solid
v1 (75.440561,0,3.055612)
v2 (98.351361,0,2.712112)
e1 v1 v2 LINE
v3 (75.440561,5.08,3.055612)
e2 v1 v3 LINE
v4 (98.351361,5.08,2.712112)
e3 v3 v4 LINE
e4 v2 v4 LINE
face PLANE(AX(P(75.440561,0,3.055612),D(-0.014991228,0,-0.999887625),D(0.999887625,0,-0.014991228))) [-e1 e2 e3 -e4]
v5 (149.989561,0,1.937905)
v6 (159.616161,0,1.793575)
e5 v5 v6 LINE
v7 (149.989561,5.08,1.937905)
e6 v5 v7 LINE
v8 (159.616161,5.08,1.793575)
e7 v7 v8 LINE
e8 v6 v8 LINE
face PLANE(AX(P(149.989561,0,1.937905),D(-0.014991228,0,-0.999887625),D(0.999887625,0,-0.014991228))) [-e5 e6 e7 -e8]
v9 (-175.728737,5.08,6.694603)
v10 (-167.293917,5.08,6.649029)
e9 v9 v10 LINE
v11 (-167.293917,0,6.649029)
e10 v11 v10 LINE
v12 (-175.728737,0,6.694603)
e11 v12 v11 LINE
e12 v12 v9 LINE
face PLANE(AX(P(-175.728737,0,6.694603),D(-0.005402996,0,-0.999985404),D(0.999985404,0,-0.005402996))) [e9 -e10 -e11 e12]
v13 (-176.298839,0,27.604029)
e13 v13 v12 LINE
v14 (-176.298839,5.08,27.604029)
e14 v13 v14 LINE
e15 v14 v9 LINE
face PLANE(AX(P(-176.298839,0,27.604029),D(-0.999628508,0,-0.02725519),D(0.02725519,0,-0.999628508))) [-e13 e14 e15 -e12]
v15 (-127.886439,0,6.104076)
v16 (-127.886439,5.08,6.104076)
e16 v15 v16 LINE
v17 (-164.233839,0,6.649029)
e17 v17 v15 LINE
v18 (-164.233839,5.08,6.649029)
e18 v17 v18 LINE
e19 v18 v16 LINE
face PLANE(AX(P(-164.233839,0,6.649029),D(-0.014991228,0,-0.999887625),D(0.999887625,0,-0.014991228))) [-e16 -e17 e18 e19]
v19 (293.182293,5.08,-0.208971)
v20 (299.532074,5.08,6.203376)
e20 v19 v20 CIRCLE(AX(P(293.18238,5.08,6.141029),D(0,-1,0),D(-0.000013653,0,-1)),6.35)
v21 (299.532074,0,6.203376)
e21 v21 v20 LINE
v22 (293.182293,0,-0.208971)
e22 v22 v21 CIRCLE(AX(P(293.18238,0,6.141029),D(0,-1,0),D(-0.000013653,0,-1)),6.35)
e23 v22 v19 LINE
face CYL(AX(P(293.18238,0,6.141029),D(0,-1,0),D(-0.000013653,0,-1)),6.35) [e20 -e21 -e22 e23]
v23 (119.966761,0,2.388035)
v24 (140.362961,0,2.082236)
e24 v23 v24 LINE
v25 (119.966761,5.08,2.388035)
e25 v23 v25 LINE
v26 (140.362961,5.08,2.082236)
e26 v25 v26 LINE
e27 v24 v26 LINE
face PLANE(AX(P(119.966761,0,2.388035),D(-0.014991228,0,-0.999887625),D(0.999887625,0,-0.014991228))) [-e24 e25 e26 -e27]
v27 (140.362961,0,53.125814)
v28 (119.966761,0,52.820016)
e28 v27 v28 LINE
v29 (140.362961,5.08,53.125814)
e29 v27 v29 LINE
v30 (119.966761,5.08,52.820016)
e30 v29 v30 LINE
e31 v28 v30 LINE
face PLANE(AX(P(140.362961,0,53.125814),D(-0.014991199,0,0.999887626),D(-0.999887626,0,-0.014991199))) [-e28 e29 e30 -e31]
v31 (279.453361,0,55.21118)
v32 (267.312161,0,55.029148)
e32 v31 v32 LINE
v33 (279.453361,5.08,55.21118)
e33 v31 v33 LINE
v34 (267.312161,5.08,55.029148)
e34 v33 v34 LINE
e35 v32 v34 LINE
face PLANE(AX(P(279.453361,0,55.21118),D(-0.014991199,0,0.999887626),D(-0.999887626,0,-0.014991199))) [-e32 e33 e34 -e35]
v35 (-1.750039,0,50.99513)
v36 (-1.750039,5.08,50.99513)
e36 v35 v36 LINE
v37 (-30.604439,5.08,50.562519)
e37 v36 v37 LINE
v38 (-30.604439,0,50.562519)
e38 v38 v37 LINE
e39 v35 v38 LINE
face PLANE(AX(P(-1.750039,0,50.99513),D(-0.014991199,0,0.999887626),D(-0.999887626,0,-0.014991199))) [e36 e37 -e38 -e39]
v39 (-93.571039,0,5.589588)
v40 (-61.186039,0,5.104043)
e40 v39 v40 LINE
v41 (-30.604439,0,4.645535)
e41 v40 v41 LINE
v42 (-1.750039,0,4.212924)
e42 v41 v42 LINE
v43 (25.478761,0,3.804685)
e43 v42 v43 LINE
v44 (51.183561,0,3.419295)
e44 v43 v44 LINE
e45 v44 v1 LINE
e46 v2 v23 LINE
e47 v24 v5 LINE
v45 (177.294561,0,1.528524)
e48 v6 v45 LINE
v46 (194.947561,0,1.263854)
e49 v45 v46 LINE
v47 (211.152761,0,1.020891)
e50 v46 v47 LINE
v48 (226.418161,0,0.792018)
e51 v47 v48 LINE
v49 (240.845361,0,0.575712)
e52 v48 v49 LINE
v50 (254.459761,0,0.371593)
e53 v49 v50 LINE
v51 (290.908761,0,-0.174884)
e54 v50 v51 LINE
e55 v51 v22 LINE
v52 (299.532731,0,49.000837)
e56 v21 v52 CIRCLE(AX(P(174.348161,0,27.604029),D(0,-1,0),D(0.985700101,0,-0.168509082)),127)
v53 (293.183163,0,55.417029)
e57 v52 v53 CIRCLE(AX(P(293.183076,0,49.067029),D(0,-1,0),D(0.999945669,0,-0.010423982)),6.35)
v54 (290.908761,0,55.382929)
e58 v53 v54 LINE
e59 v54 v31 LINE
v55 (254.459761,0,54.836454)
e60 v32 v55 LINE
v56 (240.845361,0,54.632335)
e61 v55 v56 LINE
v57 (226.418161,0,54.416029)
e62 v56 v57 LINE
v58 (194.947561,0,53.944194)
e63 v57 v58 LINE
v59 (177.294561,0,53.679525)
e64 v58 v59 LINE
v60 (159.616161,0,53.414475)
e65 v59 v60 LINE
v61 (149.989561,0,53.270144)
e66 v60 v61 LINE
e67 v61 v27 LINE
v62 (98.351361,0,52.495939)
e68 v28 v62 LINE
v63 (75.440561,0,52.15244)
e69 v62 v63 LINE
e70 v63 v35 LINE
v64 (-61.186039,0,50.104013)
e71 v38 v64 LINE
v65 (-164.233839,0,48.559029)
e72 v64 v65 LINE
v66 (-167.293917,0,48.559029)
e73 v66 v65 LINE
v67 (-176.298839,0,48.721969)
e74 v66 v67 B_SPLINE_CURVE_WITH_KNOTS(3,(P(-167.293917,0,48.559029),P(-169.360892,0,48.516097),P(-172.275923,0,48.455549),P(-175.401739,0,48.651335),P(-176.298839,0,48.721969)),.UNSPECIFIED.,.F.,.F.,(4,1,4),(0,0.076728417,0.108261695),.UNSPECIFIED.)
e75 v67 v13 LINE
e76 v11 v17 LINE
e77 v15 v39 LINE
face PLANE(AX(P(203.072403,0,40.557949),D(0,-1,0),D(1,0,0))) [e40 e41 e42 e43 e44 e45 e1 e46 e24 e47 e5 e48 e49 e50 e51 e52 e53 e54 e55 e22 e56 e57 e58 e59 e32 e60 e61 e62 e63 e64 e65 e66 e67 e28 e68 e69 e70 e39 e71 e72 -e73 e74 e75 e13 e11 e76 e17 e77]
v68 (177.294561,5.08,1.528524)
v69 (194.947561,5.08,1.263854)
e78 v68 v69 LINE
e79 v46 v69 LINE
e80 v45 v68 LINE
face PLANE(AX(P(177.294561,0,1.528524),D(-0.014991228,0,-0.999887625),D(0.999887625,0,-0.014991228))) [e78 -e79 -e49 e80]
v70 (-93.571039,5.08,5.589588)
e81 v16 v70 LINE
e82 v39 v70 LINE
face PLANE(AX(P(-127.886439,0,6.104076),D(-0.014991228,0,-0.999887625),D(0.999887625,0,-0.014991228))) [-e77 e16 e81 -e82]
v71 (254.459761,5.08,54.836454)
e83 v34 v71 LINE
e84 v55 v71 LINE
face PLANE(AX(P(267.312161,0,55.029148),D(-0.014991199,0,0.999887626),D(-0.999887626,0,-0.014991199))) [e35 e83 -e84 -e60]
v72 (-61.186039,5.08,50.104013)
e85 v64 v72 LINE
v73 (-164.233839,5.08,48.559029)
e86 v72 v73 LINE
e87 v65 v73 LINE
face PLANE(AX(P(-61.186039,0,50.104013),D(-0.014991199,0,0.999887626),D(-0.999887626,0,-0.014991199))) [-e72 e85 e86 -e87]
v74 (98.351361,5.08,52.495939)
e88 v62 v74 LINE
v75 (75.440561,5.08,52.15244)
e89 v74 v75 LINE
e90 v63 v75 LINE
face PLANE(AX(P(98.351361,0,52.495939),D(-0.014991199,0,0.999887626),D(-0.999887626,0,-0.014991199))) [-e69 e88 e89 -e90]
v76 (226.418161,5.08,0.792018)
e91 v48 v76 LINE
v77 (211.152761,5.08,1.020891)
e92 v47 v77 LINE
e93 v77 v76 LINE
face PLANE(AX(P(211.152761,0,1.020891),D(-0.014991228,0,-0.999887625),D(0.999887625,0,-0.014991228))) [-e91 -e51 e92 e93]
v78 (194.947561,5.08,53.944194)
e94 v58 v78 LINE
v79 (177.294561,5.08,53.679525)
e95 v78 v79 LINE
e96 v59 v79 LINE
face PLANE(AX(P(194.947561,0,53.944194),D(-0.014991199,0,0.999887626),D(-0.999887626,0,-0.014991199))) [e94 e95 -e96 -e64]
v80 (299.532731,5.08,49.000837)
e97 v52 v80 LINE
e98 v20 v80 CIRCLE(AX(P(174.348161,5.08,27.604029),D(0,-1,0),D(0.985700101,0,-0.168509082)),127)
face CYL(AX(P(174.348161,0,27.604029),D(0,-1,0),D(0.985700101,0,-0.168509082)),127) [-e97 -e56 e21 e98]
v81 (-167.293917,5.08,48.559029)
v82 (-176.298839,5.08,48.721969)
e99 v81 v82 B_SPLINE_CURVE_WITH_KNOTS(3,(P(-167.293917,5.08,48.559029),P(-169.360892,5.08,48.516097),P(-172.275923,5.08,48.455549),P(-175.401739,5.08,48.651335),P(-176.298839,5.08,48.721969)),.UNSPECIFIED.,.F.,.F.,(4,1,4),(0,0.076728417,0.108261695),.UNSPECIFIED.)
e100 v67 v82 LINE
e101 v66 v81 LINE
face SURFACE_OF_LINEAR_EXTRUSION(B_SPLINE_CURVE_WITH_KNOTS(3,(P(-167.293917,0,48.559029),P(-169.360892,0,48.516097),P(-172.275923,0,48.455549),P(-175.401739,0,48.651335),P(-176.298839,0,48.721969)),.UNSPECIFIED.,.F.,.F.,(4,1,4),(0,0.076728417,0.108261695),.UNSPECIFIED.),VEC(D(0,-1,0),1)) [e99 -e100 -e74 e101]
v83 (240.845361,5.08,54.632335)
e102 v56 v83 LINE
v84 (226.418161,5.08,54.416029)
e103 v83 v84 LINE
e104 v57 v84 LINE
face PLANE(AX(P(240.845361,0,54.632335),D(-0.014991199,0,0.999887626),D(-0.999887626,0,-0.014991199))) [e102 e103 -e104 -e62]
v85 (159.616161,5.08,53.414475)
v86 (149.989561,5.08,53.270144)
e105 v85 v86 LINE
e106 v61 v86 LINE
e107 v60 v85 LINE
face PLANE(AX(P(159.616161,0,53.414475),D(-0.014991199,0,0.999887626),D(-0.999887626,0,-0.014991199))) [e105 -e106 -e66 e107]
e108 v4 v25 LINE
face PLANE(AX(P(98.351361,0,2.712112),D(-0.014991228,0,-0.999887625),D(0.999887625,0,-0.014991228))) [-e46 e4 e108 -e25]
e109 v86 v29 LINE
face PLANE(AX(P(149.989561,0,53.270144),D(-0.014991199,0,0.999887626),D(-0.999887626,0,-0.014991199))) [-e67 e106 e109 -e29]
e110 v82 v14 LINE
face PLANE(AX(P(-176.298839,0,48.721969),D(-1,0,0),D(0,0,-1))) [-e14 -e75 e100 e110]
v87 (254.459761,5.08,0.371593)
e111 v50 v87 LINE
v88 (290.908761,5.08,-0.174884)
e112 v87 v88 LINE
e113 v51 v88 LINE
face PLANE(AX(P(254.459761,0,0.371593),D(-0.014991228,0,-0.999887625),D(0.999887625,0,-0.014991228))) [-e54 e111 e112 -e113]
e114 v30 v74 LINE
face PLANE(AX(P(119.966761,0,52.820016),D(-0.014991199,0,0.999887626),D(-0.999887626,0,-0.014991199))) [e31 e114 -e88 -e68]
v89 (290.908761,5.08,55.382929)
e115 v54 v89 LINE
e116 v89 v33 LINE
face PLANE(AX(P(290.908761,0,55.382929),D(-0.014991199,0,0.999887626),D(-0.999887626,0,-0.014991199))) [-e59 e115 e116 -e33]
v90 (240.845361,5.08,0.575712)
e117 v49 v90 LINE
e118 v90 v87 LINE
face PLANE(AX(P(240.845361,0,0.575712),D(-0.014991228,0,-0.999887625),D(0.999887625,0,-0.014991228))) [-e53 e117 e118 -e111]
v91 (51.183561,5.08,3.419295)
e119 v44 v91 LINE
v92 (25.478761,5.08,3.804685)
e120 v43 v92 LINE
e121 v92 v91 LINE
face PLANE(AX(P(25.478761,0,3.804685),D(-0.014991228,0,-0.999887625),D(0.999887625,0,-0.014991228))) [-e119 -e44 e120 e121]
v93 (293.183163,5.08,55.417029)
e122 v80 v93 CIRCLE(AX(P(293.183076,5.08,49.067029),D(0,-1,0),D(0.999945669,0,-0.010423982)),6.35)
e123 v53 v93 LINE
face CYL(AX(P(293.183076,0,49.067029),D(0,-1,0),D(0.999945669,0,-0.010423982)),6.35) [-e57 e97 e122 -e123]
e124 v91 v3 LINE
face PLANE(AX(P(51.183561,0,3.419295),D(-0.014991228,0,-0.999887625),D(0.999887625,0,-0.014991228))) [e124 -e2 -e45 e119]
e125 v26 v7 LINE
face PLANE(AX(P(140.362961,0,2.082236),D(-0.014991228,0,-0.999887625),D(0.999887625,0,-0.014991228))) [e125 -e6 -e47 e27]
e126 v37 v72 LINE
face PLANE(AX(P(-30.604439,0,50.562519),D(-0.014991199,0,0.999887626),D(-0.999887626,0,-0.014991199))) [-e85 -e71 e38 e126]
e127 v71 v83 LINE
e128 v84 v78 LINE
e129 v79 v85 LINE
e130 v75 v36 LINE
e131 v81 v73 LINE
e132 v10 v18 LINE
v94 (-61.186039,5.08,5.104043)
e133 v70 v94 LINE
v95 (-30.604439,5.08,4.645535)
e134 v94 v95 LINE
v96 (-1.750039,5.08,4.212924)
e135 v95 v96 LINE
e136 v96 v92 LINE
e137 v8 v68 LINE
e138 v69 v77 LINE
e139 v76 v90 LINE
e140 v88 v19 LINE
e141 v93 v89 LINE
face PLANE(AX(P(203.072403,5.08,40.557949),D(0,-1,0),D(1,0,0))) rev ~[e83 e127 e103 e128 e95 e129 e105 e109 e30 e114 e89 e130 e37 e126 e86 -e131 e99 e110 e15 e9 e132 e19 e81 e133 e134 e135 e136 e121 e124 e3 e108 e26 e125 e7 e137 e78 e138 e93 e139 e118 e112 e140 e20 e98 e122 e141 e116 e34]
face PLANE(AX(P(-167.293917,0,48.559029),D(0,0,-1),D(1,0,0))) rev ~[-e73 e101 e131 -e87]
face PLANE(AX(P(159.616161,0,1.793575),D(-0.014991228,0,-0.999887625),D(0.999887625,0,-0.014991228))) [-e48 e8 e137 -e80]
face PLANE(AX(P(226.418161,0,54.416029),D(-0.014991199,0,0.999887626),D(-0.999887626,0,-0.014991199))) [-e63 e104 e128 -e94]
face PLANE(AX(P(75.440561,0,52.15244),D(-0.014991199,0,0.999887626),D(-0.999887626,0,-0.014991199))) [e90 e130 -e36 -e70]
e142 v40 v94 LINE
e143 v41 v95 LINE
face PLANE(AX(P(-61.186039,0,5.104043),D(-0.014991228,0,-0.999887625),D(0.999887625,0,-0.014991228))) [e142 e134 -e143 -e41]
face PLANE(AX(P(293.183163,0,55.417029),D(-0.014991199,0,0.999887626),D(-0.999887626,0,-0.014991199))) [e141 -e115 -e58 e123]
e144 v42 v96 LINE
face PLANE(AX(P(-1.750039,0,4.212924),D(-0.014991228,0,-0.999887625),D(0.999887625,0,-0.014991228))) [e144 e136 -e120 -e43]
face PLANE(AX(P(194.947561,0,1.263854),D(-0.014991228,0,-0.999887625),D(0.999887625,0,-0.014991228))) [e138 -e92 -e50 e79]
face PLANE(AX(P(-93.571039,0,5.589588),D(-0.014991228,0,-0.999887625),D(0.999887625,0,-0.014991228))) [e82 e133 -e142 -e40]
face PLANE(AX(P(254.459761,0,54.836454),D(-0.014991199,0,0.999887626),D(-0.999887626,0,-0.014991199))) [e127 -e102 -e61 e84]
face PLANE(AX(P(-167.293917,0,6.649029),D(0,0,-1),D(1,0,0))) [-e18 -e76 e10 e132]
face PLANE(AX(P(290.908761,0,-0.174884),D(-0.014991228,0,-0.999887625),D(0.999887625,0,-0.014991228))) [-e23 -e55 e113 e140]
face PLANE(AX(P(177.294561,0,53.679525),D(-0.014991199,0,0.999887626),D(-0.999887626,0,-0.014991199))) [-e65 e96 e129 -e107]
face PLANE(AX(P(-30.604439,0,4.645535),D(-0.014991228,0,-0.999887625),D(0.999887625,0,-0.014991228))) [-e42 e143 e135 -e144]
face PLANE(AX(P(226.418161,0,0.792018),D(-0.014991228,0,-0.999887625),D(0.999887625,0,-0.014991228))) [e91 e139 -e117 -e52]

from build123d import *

# Parameters (mm, degrees)
F0_W     = 3.0600779591
F0_H     = 20.955
F1_DEPTH = 5.08


# Not quite as in the source:
# - a feature names something its author has since deleted; it is built from what else it names


with BuildPart() as f1:
    # F0 (on Front) → F1 (new body)
    with BuildSketch(Plane.XZ):
        with BuildLine():
            Line((211.1527612069, 54.1871569779), (194.9475612069, 53.9441942956))
            Line((194.9475612069, 53.9441942956), (194.9475612069, 27.6040292631))
            Line((194.9475612069, 27.6040292631), (199.8751612069, 27.6040292631))
            ThreePointArc((199.8751612069, 27.6040292631), (203.0501612069, 30.7790292631), (206.2251612069, 27.6040292631))
            Line((206.2251612069, 27.6040292631), (211.1527612069, 27.6040292631))
            Line((211.1527612069, 27.6040292631), (211.1527612069, 54.1871569779))
        make_face()
        with BuildLine():
            Line((35.1561612069, 27.6040292631), (25.4787612069, 27.6040292631))
            Line((25.4787612069, 27.6040292631), (25.4787612069, 3.8046848733))
            Line((25.4787612069, 3.8046848733), (51.1835612069, 3.4192950591))
            Line((51.1835612069, 3.4192950591), (51.1835612069, 27.6040292631))
            Line((51.1835612069, 27.6040292631), (41.5061612069, 27.6040292631))
            ThreePointArc((41.5061612069, 27.6040292631), (38.3311612069, 24.4290292631), (35.1561612069, 27.6040292631))
        make_face()
        Polygon((75.4405612069, 52.1524397183), (51.1835612069, 51.7887573333), (51.1835612069, 27.6040292631), (75.4405612069, 27.6040292631), align=None)
        Polygon((119.9667612069, 52.8200158658), (98.3513612069, 52.4959386829), (98.3513612069, 27.6040292631), (119.9667612069, 27.6040292631), align=None)
        Polygon((-127.8864387931, 6.1040758796), (-93.5710387931, 5.589588094), (-93.5710387931, 27.6040292631), (-127.8864387931, 27.6040292631), align=None)
        with BuildLine():
            ThreePointArc((-19.3522387931, 27.6040292631), (-16.1772387931, 30.7790292631), (-13.0022387931, 27.6040292631))
            Line((-13.0022387931, 27.6040292631), (-1.7500387931, 27.6040292631))
            Line((-1.7500387931, 27.6040292631), (-1.7500387931, 50.9951300136))
            Line((-1.7500387931, 50.9951300136), (-30.6044387931, 50.5625193442))
            Line((-30.6044387931, 50.5625193442), (-30.6044387931, 27.6040292631))
            Line((-30.6044387931, 27.6040292631), (-19.3522387931, 27.6040292631))
        make_face()
        Polygon((-93.5710387931, 27.6040292631), (-93.5710387931, 49.6184684202), (-127.8864387931, 49.1039816117), (-127.8864387931, 27.6040292631), align=None)
        Polygon((-30.6044387931, 4.6455353771), (-30.6044387931, 27.6040292631), (-61.1860387931, 27.6040292631), (-61.1860387931, 5.1040426264), align=None)
        Polygon((51.1835612069, 27.6040292631), (51.1835612069, 3.4192950591), (75.4405612069, 3.0556119834), (75.4405612069, 27.6040292631), align=None)
        Polygon((119.9667612069, 27.6040292631), (119.9667612069, 2.388034568), (140.3629612069, 2.0822361285), (140.3629612069, 14.6379053581), (140.3629612069, 27.6040292631), align=None)
        Polygon((98.3513612069, 27.6040292631), (98.3513612069, 2.7121123663), (119.9667612069, 2.388034568), (119.9667612069, 27.6040292631), align=None)
        with BuildLine():
            Line((-74.2035387931, 27.6040292631), (-61.1860387931, 27.6040292631))
            Line((-61.1860387931, 27.6040292631), (-61.1860387931, 50.1040129656))
            Line((-61.1860387931, 50.1040129656), (-93.5710387931, 49.6184684202))
            Line((-93.5710387931, 49.6184684202), (-93.5710387931, 27.6040292631))
            Line((-93.5710387931, 27.6040292631), (-80.5535387931, 27.6040292631))
            ThreePointArc((-80.5535387931, 27.6040292631), (-77.3785387931, 30.7790292631), (-74.2035387931, 27.6040292631))
        make_face()
        with BuildLine():
            Line((25.4787612069, 51.403368251), (25.4787612069, 27.6040292631))
            Line((25.4787612069, 27.6040292631), (35.1561612069, 27.6040292631))
            ThreePointArc((35.1561612069, 27.6040292631), (38.3311612069, 30.7790292631), (41.5061612069, 27.6040292631))
            Line((41.5061612069, 27.6040292631), (51.1835612069, 27.6040292631))
            Line((51.1835612069, 27.6040292631), (51.1835612069, 51.7887573333))
            Line((51.1835612069, 51.7887573333), (25.4787612069, 51.403368251))
        make_face()
        Polygon((-61.1860387931, 27.6040292631), (-30.6044387931, 27.6040292631), (-30.6044387931, 50.5625193442), (-61.1860387931, 50.1040129656), align=None)
        Polygon((-164.2338387931, 6.6490292631), (-127.8864387931, 6.1040758796), (-127.8864387931, 27.6040292631), (-164.2338387931, 27.6040292631), align=None)
        with BuildLine():
            Line((-167.2939167522, 27.6040292631), (-167.2939167522, 48.5590292631))
            add(Edge.make_bspline(
                [(-167.2939167522, 48.5590292631), (-169.3608924509, 48.5160966839), (-172.2759226046, 48.4555494006), (-175.4017391189, 48.6513352899), (-176.2988387931, 48.7219685213)],
                knots=[0, 0, 0, 0, 0.0767284167, 0.1082616947, 0.1082616947, 0.1082616947, 0.1082616947], degree=3))
            Line((-176.2988387931, 48.7219685213), (-176.2988387931, 27.6040292631))
            Line((-176.2988387931, 27.6040292631), (-167.2939167522, 27.6040292631))
        make_face()
        with BuildLine():
            Line((75.4405612069, 27.6040292631), (75.4405612069, 3.0556119834))
            Line((75.4405612069, 3.0556119834), (98.3513612069, 2.7121123663))
            Line((98.3513612069, 2.7121123663), (98.3513612069, 27.6040292631))
            Line((98.3513612069, 27.6040292631), (90.0709612069, 27.6040292631))
            ThreePointArc((90.0709612069, 27.6040292631), (86.8959612069, 24.4290292631), (83.7209612069, 27.6040292631))
            Line((83.7209612069, 27.6040292631), (75.4405612069, 27.6040292631))
        make_face()
        Polygon((177.2945612069, 27.6040292631), (177.2945612069, 1.5285238855), (194.9475612069, 1.2638540032), (194.9475612069, 27.6040292631), align=None)
        with BuildLine():
            Line((98.3513612069, 52.4959386829), (75.4405612069, 52.1524397183))
            Line((75.4405612069, 52.1524397183), (75.4405612069, 27.6040292631))
            Line((75.4405612069, 27.6040292631), (83.7209612069, 27.6040292631))
            ThreePointArc((83.7209612069, 27.6040292631), (86.8959612069, 30.7790292631), (90.0709612069, 27.6040292631))
            Line((90.0709612069, 27.6040292631), (98.3513612069, 27.6040292631))
            Line((98.3513612069, 27.6040292631), (98.3513612069, 52.4959386829))
        make_face()
        with BuildLine():
            Line((194.9475612069, 27.6040292631), (194.9475612069, 1.2638540032))
            Line((194.9475612069, 1.2638540032), (211.1527612069, 1.0208908594))
            Line((211.1527612069, 1.0208908594), (211.1527612069, 27.6040292631))
            Line((211.1527612069, 27.6040292631), (206.2251612069, 27.6040292631))
            ThreePointArc((206.2251612069, 27.6040292631), (203.0501612069, 24.4290292631), (199.8751612069, 27.6040292631))
            Line((199.8751612069, 27.6040292631), (194.9475612069, 27.6040292631))
        make_face()
        Polygon((-127.8864387931, 27.6040292631), (-127.8864387931, 49.1039816117), (-164.2338387931, 48.5590292631), (-164.2338387931, 27.6040292631), align=None)
        Polygon((140.3629612069, 53.1258137246), (119.9667612069, 52.8200158658), (119.9667612069, 27.6040292631), (140.3629612069, 27.6040292631), (140.3629612069, 40.5701442208), align=None)
        with BuildLine():
            Line((-1.7500387931, 27.6040292631), (-13.0022387931, 27.6040292631))
            ThreePointArc((-13.0022387931, 27.6040292631), (-16.1772387931, 24.4290292631), (-19.3522387931, 27.6040292631))
            Line((-19.3522387931, 27.6040292631), (-30.6044387931, 27.6040292631))
            Line((-30.6044387931, 27.6040292631), (-30.6044387931, 4.6455353771))
            Line((-30.6044387931, 4.6455353771), (-1.7500387931, 4.212923886))
            Line((-1.7500387931, 4.212923886), (-1.7500387931, 27.6040292631))
        make_face()
        Polygon((267.3121612069, 27.6040292631), (267.3121612069, 0.1788978957), (279.4533612069, -0.0031340521), (279.4533612069, 27.6040292631), align=None)
        Polygon((194.9475612069, 53.9441942956), (177.2945612069, 53.679524916), (177.2945612069, 27.6040292631), (194.9475612069, 27.6040292631), align=None)
        with BuildLine():
            Line((290.9087612069, 55.382929427), (279.4533612069, 55.2111799446))
            Line((279.4533612069, 55.2111799446), (279.4533612069, 27.6040292631))
            Line((279.4533612069, 27.6040292631), (282.0060612069, 27.6040292631))
            ThreePointArc((282.0060612069, 27.6040292631), (285.1810612069, 30.7790292631), (288.3560612069, 27.6040292631))
            Line((288.3560612069, 27.6040292631), (290.9087612069, 27.6040292631))
            Line((290.9087612069, 27.6040292631), (290.9087612069, 55.382929427))
        make_face()
        Polygon((279.4533612069, 55.2111799446), (267.3121612069, 55.0291483425), (267.3121612069, 27.6040292631), (279.4533612069, 27.6040292631), align=None)
        Polygon((177.2945612069, 53.679524916), (159.6161612069, 53.4144747171), (159.6161612069, 40.5701442208), (159.6161612069, 27.6040292631), (177.2945612069, 27.6040292631), align=None)
        with BuildLine():
            Line((140.3629612069, 14.6379053581), (140.3629612069, 2.0822361285))
            Line((140.3629612069, 2.0822361285), (149.9895612069, 1.9379053581))
            Line((149.9895612069, 1.9379053581), (149.9895612069, 11.4629053581))
            ThreePointArc((149.9895612069, 11.4629053581), (147.7444971767, 12.3928413278), (146.8145612069, 14.6379053581))
            Line((146.8145612069, 14.6379053581), (140.3629612069, 14.6379053581))
        make_face()
        with BuildLine():
            Line((226.4181612069, 27.6040292631), (226.4181612069, 0.7920180547))
            Line((226.4181612069, 0.7920180547), (240.8453612069, 0.5757123092))
            Line((240.8453612069, 0.5757123092), (240.8453612069, 27.6040292631))
            Line((240.8453612069, 27.6040292631), (236.8067612069, 27.6040292631))
            ThreePointArc((236.8067612069, 27.6040292631), (233.6317612069, 24.4290292631), (230.4567612069, 27.6040292631))
            Line((230.4567612069, 27.6040292631), (226.4181612069, 27.6040292631))
        make_face()
        Polygon((211.1527612069, 27.6040292631), (211.1527612069, 1.0208908594), (226.4181612069, 0.7920180547), (226.4181612069, 27.6040292631), align=None)
        Polygon((254.4597612069, 54.8364538014), (240.8453612069, 54.6323346827), (240.8453612069, 27.6040292631), (254.4597612069, 27.6040292631), align=None)
        Polygon((159.6161612069, 14.6379053581), (159.6161612069, 1.7935745878), (177.2945612069, 1.5285238855), (177.2945612069, 27.6040292631), (159.6161612069, 27.6040292631), align=None)
        with BuildLine():
            Line((267.3121612069, 55.0291483425), (254.4597612069, 54.8364538014))
            Line((254.4597612069, 54.8364538014), (254.4597612069, 27.6040292631))
            Line((254.4597612069, 27.6040292631), (257.7109612069, 27.6040292631))
            ThreePointArc((257.7109612069, 27.6040292631), (260.8859612069, 30.7790292631), (264.0609612069, 27.6040292631))
            Line((264.0609612069, 27.6040292631), (267.3121612069, 27.6040292631))
            Line((267.3121612069, 27.6040292631), (267.3121612069, 55.0291483425))
        make_face()
        with BuildLine():
            Line((149.9895612069, 53.2701442208), (140.3629612069, 53.1258137246))
            Line((140.3629612069, 53.1258137246), (140.3629612069, 40.5701442208))
            Line((140.3629612069, 40.5701442208), (146.8145612069, 40.5701442208))
            ThreePointArc((146.8145612069, 40.5701442208), (147.7444971767, 42.8152082511), (149.9895612069, 43.7451442208))
            Line((149.9895612069, 43.7451442208), (149.9895612069, 53.2701442208))
        make_face()
        with BuildLine():
            Line((240.8453612069, 54.6323346827), (226.4181612069, 54.4160293479))
            Line((226.4181612069, 54.4160293479), (226.4181612069, 27.6040292631))
            Line((226.4181612069, 27.6040292631), (230.4567612069, 27.6040292631))
            ThreePointArc((230.4567612069, 27.6040292631), (233.6317612069, 30.7790292631), (236.8067612069, 27.6040292631))
            Line((236.8067612069, 27.6040292631), (240.8453612069, 27.6040292631))
            Line((240.8453612069, 27.6040292631), (240.8453612069, 54.6323346827))
        make_face()
        Polygon((226.4181612069, 54.4160293479), (211.1527612069, 54.1871569779), (211.1527612069, 27.6040292631), (226.4181612069, 27.6040292631), align=None)
        Polygon((-1.7500387931, 50.9951300136), (-1.7500387931, 27.6040292631), (25.4787612069, 27.6040292631), (25.4787612069, 51.403368251), align=None)
        Polygon((25.4787612069, 27.6040292631), (-1.7500387931, 27.6040292631), (-1.7500387931, 4.212923886), (25.4787612069, 3.8046848733), align=None)
        Polygon((240.8453612069, 27.6040292631), (240.8453612069, 0.5757123092), (254.4597612069, 0.3715928028), (254.4597612069, 27.6040292631), align=None)
        with BuildLine():
            Line((-61.1860387931, 5.1040426264), (-61.1860387931, 27.6040292631))
            Line((-61.1860387931, 27.6040292631), (-74.2035387931, 27.6040292631))
            ThreePointArc((-74.2035387931, 27.6040292631), (-77.3785387931, 24.4290292631), (-80.5535387931, 27.6040292631))
            Line((-80.5535387931, 27.6040292631), (-93.5710387931, 27.6040292631))
            Line((-93.5710387931, 27.6040292631), (-93.5710387931, 5.589588094))
            Line((-93.5710387931, 5.589588094), (-61.1860387931, 5.1040426264))
        make_face()
        with BuildLine():
            Line((254.4597612069, 27.6040292631), (254.4597612069, 0.3715928028))
            Line((254.4597612069, 0.3715928028), (267.3121612069, 0.1788978957))
            Line((267.3121612069, 0.1788978957), (267.3121612069, 27.6040292631))
            Line((267.3121612069, 27.6040292631), (264.0609612069, 27.6040292631))
            ThreePointArc((264.0609612069, 27.6040292631), (260.8859612069, 24.4290292631), (257.7109612069, 27.6040292631))
            Line((257.7109612069, 27.6040292631), (254.4597612069, 27.6040292631))
        make_face()
        with BuildLine():
            ThreePointArc((41.5061612069, 27.6040292631), (38.3311612069, 30.7790292631), (35.1561612069, 27.6040292631))
            Line((35.1561612069, 27.6040292631), (41.5061612069, 27.6040292631))
        make_face()
        with BuildLine():
            Line((41.5061612069, 27.6040292631), (35.1561612069, 27.6040292631))
            ThreePointArc((35.1561612069, 27.6040292631), (38.3311612069, 24.4290292631), (41.5061612069, 27.6040292631))
        make_face()
        with BuildLine():
            ThreePointArc((90.0709612069, 27.6040292631), (86.8959612069, 30.7790292631), (83.7209612069, 27.6040292631))
            Line((83.7209612069, 27.6040292631), (90.0709612069, 27.6040292631))
        make_face()
        with BuildLine():
            Line((149.9895612069, 27.6040292631), (140.3629612069, 27.6040292631))
            Line((140.3629612069, 27.6040292631), (140.3629612069, 14.6379053581))
            Line((140.3629612069, 14.6379053581), (146.8145612069, 14.6379053581))
            ThreePointArc((146.8145612069, 14.6379053581), (147.7444971767, 16.8829693884), (149.9895612069, 17.8129053581))
            Line((149.9895612069, 17.8129053581), (149.9895612069, 27.6040292631))
        make_face()
        with BuildLine():
            Line((-80.5535387931, 27.6040292631), (-74.2035387931, 27.6040292631))
            ThreePointArc((-74.2035387931, 27.6040292631), (-77.3785387931, 30.7790292631), (-80.5535387931, 27.6040292631))
        make_face()
        with BuildLine():
            ThreePointArc((-80.5535387931, 27.6040292631), (-77.3785387931, 24.4290292631), (-74.2035387931, 27.6040292631))
            Line((-74.2035387931, 27.6040292631), (-80.5535387931, 27.6040292631))
        make_face()
        with BuildLine():
            Line((-19.3522387931, 27.6040292631), (-13.0022387931, 27.6040292631))
            ThreePointArc((-13.0022387931, 27.6040292631), (-16.1772387931, 30.7790292631), (-19.3522387931, 27.6040292631))
        make_face()
        with BuildLine():
            ThreePointArc((-19.3522387931, 27.6040292631), (-16.1772387931, 24.4290292631), (-13.0022387931, 27.6040292631))
            Line((-13.0022387931, 27.6040292631), (-19.3522387931, 27.6040292631))
        make_face()
        with BuildLine():
            Line((90.0709612069, 27.6040292631), (83.7209612069, 27.6040292631))
            ThreePointArc((83.7209612069, 27.6040292631), (86.8959612069, 24.4290292631), (90.0709612069, 27.6040292631))
        make_face()
        with BuildLine():
            Line((279.4533612069, 27.6040292631), (279.4533612069, -0.0031340521))
            Line((279.4533612069, -0.0031340521), (290.9087612069, -0.1748838606))
            Line((290.9087612069, -0.1748838606), (290.9087612069, 27.6040292631))
            Line((290.9087612069, 27.6040292631), (288.3560612069, 27.6040292631))
            ThreePointArc((288.3560612069, 27.6040292631), (285.1810612069, 24.4290292631), (282.0060612069, 27.6040292631))
            Line((282.0060612069, 27.6040292631), (279.4533612069, 27.6040292631))
        make_face()
        with BuildLine():
            Line((159.6161612069, 27.6040292631), (149.9895612069, 27.6040292631))
            Line((149.9895612069, 27.6040292631), (149.9895612069, 17.8129053581))
            ThreePointArc((149.9895612069, 17.8129053581), (152.2346252372, 16.8829693884), (153.1645612069, 14.6379053581))
            Line((153.1645612069, 14.6379053581), (159.6161612069, 14.6379053581))
            Line((159.6161612069, 14.6379053581), (159.6161612069, 27.6040292631))
        make_face()
        with BuildLine():
            ThreePointArc((299.5327314187, 49.000836976), (297.6965766308, 53.53366288), (293.1831626072, 55.4170292631))
            Line((293.1831626072, 55.4170292631), (293.1827280197, 27.6040292631))
            Line((293.1827280197, 27.6040292631), (293.1822934321, -0.2089707301))
            ThreePointArc((293.1822934321, -0.2089707301), (297.6944667131, 1.6729676451), (299.5320740528, 6.2033759083))
            ThreePointArc((299.5320740528, 6.2033759083), (301.3481611896, 27.6020785522), (299.5327314187, 49.000836976))
        make_face()
        with BuildLine():
            Line((146.8145612069, 40.5701442208), (140.3629612069, 40.5701442208))
            Line((140.3629612069, 40.5701442208), (140.3629612069, 27.6040292631))
            Line((140.3629612069, 27.6040292631), (149.9895612069, 27.6040292631))
            Line((149.9895612069, 27.6040292631), (149.9895612069, 37.3951442208))
            ThreePointArc((149.9895612069, 37.3951442208), (147.7444971767, 38.3250801906), (146.8145612069, 40.5701442208))
        make_face()
        with BuildLine():
            Line((149.9895612069, 37.3951442208), (149.9895612069, 27.6040292631))
            Line((149.9895612069, 27.6040292631), (159.6161612069, 27.6040292631))
            Line((159.6161612069, 27.6040292631), (159.6161612069, 40.5701442208))
            Line((159.6161612069, 40.5701442208), (153.1645612069, 40.5701442208))
            ThreePointArc((153.1645612069, 40.5701442208), (152.2346252372, 38.3250801906), (149.9895612069, 37.3951442208))
        make_face()
        with BuildLine():
            Line((149.9895612069, 11.4629053581), (149.9895612069, 1.9379053581))
            Line((149.9895612069, 1.9379053581), (159.6161612069, 1.7935745878))
            Line((159.6161612069, 1.7935745878), (159.6161612069, 14.6379053581))
            Line((159.6161612069, 14.6379053581), (153.1645612069, 14.6379053581))
            ThreePointArc((153.1645612069, 14.6379053581), (152.2346252372, 12.3928413278), (149.9895612069, 11.4629053581))
        make_face()
        with BuildLine():
            Line((159.6161612069, 53.4144747171), (149.9895612069, 53.2701442208))
            Line((149.9895612069, 53.2701442208), (149.9895612069, 43.7451442208))
            ThreePointArc((149.9895612069, 43.7451442208), (152.2346252372, 42.8152082511), (153.1645612069, 40.5701442208))
            Line((153.1645612069, 40.5701442208), (159.6161612069, 40.5701442208))
            Line((159.6161612069, 40.5701442208), (159.6161612069, 53.4144747171))
        make_face()
        with BuildLine():
            ThreePointArc((149.9895612069, 17.8129053581), (147.7444971767, 16.8829693884), (146.8145612069, 14.6379053581))
            Line((146.8145612069, 14.6379053581), (149.9895612069, 14.6379053581))
            Line((149.9895612069, 14.6379053581), (149.9895612069, 17.8129053581))
        make_face()
        with BuildLine():
            Line((149.9895612069, 40.5701442208), (149.9895612069, 43.7451442208))
            ThreePointArc((149.9895612069, 43.7451442208), (147.7444971767, 42.8152082511), (146.8145612069, 40.5701442208))
            Line((146.8145612069, 40.5701442208), (149.9895612069, 40.5701442208))
        make_face()
        with BuildLine():
            Line((206.2251612069, 27.6040292631), (199.8751612069, 27.6040292631))
            ThreePointArc((199.8751612069, 27.6040292631), (203.0501612069, 24.4290292631), (206.2251612069, 27.6040292631))
        make_face()
        with BuildLine():
            ThreePointArc((206.2251612069, 27.6040292631), (203.0501612069, 30.7790292631), (199.8751612069, 27.6040292631))
            Line((199.8751612069, 27.6040292631), (206.2251612069, 27.6040292631))
        make_face()
        with BuildLine():
            ThreePointArc((236.8067612069, 27.6040292631), (233.6317612069, 30.7790292631), (230.4567612069, 27.6040292631))
            Line((230.4567612069, 27.6040292631), (236.8067612069, 27.6040292631))
        make_face()
        with BuildLine():
            ThreePointArc((288.3560612069, 27.6040292631), (285.1810612069, 30.7790292631), (282.0060612069, 27.6040292631))
            Line((282.0060612069, 27.6040292631), (288.3560612069, 27.6040292631))
        make_face()
        with BuildLine():
            Line((236.8067612069, 27.6040292631), (230.4567612069, 27.6040292631))
            ThreePointArc((230.4567612069, 27.6040292631), (233.6317612069, 24.4290292631), (236.8067612069, 27.6040292631))
        make_face()
        with BuildLine():
            ThreePointArc((264.0609612069, 27.6040292631), (260.8859612069, 30.7790292631), (257.7109612069, 27.6040292631))
            Line((257.7109612069, 27.6040292631), (264.0609612069, 27.6040292631))
        make_face()
        with BuildLine():
            Line((264.0609612069, 27.6040292631), (257.7109612069, 27.6040292631))
            ThreePointArc((257.7109612069, 27.6040292631), (260.8859612069, 24.4290292631), (264.0609612069, 27.6040292631))
        make_face()
        with BuildLine():
            Line((288.3560612069, 27.6040292631), (282.0060612069, 27.6040292631))
            ThreePointArc((282.0060612069, 27.6040292631), (285.1810612069, 24.4290292631), (288.3560612069, 27.6040292631))
        make_face()
        Polygon((290.9087612069, 27.6040292631), (290.9087612069, -0.1748838606), (293.1822934321, -0.2089707301), (293.1827280197, 27.6040292631), align=None)
        with BuildLine():
            ThreePointArc((153.1645612069, 14.6379053581), (152.2346252372, 16.8829693884), (149.9895612069, 17.8129053581))
            Line((149.9895612069, 17.8129053581), (149.9895612069, 14.6379053581))
            Line((149.9895612069, 14.6379053581), (153.1645612069, 14.6379053581))
        make_face()
        with BuildLine():
            ThreePointArc((146.8145612069, 14.6379053581), (147.7444971767, 12.3928413278), (149.9895612069, 11.4629053581))
            Line((149.9895612069, 11.4629053581), (149.9895612069, 14.6379053581))
            Line((149.9895612069, 14.6379053581), (146.8145612069, 14.6379053581))
        make_face()
        Polygon((293.1831626072, 55.4170292631), (290.9087612069, 55.382929427), (290.9087612069, 27.6040292631), (293.1827280197, 27.6040292631), align=None)
        with BuildLine():
            ThreePointArc((149.9895612069, 37.3951442208), (152.2346252372, 38.3250801906), (153.1645612069, 40.5701442208))
            Line((153.1645612069, 40.5701442208), (149.9895612069, 40.5701442208))
            Line((149.9895612069, 40.5701442208), (149.9895612069, 37.3951442208))
        make_face()
        with Locations((-165.7638777726, 38.0815292631)):
            Rectangle(F0_W, F0_H)
        with Locations((-165.7638777726, 17.1265292631)):
            Rectangle(F0_W, F0_H)
        with BuildLine():
            Line((149.9895612069, 14.6379053581), (149.9895612069, 11.4629053581))
            ThreePointArc((149.9895612069, 11.4629053581), (152.2346252372, 12.3928413278), (153.1645612069, 14.6379053581))
            Line((153.1645612069, 14.6379053581), (149.9895612069, 14.6379053581))
        make_face()
        with BuildLine():
            Line((149.9895612069, 40.5701442208), (146.8145612069, 40.5701442208))
            ThreePointArc((146.8145612069, 40.5701442208), (147.7444971767, 38.3250801906), (149.9895612069, 37.3951442208))
            Line((149.9895612069, 37.3951442208), (149.9895612069, 40.5701442208))
        make_face()
        with BuildLine():
            ThreePointArc((153.1645612069, 40.5701442208), (152.2346252372, 42.8152082511), (149.9895612069, 43.7451442208))
            Line((149.9895612069, 43.7451442208), (149.9895612069, 40.5701442208))
            Line((149.9895612069, 40.5701442208), (153.1645612069, 40.5701442208))
        make_face()
        Polygon((-175.7287366174, 6.6946032245), (-167.2939167522, 6.6490292631), (-167.2939167522, 27.6040292631), (-176.2988387931, 27.6040292631), align=None)
    extrude(amount=-F1_DEPTH)


solid = f1.part
